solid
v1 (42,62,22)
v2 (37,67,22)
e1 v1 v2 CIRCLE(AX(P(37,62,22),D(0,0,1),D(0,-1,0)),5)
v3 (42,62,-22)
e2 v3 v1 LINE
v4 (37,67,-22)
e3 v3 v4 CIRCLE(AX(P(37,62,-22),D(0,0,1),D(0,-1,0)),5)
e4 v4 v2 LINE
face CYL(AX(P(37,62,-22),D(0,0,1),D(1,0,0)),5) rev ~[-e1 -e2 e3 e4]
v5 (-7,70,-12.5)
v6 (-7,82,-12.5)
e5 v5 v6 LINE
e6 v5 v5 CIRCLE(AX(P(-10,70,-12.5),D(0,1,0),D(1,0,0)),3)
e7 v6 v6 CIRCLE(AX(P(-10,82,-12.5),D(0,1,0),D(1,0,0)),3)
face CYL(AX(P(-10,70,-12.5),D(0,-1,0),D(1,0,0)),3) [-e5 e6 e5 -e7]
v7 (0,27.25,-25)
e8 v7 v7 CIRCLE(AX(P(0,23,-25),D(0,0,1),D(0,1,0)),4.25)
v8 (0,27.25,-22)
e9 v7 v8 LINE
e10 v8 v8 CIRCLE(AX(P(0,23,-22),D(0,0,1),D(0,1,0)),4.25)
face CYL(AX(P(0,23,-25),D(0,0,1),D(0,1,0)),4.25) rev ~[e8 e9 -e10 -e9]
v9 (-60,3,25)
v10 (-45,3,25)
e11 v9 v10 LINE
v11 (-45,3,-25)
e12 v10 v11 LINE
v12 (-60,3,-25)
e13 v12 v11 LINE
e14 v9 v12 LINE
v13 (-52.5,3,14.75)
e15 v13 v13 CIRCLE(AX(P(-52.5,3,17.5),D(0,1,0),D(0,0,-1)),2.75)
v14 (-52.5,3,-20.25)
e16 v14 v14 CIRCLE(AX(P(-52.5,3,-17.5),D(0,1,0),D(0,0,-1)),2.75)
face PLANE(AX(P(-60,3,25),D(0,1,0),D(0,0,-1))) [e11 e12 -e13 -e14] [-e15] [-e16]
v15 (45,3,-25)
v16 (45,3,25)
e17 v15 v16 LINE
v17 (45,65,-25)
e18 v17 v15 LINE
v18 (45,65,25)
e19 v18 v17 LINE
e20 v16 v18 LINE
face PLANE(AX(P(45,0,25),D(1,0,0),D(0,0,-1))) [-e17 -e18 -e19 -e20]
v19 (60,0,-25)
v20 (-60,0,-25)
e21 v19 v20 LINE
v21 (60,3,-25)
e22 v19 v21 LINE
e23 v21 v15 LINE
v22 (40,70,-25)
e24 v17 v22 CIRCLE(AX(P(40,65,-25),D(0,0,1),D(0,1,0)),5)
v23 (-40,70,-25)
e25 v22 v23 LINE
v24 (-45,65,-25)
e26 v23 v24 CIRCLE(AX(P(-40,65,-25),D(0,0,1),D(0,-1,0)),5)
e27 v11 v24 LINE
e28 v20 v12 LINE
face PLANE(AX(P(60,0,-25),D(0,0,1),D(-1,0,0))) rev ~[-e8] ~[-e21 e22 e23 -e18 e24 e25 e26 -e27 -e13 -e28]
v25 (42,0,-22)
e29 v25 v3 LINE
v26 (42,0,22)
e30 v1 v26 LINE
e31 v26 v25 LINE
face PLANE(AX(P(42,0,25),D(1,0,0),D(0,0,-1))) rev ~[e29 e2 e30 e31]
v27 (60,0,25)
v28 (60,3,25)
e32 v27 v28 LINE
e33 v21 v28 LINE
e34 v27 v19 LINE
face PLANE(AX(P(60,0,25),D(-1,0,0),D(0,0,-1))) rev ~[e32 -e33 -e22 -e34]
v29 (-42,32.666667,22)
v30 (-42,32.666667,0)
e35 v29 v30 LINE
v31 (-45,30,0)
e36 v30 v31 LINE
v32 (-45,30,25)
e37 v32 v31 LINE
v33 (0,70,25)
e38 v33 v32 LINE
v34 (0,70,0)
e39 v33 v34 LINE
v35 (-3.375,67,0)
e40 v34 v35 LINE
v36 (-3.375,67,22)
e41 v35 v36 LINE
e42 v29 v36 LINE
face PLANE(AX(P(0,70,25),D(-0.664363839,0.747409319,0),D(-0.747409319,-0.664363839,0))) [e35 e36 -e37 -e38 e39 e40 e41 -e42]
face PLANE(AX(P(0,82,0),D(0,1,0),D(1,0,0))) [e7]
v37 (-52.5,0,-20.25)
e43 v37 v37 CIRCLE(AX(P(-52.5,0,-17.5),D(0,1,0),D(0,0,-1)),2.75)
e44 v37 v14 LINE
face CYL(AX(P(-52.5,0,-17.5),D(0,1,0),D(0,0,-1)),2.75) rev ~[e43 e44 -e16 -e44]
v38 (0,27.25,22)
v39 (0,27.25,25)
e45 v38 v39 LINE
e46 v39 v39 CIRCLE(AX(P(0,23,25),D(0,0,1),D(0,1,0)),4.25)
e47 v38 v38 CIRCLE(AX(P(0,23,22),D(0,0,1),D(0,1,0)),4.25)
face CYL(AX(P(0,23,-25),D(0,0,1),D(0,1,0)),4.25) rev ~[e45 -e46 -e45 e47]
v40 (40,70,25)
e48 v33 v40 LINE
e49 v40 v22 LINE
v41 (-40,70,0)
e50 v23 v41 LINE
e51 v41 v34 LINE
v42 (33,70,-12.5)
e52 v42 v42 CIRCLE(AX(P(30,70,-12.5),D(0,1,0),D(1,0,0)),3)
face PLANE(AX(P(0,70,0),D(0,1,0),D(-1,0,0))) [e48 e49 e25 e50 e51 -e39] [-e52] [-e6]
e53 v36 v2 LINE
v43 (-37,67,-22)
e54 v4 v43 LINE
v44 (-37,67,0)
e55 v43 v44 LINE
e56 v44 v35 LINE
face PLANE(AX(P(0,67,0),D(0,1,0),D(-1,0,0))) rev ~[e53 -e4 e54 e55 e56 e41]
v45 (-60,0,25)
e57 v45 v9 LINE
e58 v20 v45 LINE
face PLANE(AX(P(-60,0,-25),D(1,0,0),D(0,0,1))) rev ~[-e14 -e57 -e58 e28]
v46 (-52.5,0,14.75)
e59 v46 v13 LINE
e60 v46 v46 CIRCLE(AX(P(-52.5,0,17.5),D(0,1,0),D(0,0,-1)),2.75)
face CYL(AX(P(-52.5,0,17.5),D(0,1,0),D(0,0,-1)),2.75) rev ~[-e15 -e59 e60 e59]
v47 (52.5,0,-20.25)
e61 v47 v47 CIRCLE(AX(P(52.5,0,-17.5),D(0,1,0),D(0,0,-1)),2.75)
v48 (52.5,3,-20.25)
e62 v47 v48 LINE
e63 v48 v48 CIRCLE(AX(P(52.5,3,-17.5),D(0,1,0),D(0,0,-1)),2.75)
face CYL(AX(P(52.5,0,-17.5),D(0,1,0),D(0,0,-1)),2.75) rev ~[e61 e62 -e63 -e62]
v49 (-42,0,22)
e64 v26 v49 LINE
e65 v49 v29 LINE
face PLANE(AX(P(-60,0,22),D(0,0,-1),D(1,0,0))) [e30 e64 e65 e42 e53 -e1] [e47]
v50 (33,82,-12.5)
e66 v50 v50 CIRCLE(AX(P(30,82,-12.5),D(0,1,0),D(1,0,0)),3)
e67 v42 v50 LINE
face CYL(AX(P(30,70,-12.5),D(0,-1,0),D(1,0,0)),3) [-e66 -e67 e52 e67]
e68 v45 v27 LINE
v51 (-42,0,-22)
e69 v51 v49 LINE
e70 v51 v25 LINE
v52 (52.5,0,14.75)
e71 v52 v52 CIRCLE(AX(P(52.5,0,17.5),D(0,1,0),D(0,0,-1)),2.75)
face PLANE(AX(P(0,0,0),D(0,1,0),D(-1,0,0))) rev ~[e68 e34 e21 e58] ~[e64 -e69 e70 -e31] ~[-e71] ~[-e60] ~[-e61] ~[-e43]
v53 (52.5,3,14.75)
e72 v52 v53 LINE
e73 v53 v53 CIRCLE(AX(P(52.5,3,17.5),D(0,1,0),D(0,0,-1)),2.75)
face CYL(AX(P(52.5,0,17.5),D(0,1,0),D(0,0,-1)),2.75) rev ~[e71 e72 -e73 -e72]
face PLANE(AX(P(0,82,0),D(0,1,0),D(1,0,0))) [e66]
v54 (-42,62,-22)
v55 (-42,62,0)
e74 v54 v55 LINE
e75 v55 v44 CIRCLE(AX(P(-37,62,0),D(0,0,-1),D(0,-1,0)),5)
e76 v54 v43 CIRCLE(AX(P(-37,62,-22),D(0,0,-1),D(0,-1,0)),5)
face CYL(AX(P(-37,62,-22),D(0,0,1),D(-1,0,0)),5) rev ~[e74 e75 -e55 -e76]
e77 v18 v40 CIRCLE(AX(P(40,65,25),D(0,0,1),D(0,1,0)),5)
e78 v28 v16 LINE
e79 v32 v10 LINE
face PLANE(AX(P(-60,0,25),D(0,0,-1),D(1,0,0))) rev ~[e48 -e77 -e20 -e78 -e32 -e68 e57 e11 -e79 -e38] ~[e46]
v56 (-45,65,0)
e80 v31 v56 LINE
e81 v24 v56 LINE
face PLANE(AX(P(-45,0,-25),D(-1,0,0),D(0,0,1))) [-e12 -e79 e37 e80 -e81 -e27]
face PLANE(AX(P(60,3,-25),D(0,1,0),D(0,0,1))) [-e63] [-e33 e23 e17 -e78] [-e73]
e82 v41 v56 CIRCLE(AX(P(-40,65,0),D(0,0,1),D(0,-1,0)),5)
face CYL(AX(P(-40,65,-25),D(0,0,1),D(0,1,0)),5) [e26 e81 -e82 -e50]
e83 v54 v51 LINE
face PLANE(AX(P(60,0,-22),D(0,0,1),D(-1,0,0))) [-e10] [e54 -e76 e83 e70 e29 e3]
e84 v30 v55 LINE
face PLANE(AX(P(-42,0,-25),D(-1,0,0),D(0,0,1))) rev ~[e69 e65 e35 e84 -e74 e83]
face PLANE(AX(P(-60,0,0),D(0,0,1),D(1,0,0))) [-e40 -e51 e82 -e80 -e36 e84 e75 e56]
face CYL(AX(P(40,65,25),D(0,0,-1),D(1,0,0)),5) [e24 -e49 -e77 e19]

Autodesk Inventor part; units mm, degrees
ref_plane "YZ Plane" through (0, 0, 0) normal (1, 0, 0) x (0, 1, 0)
ref_plane "XZ Plane" through (0, 0, 0) normal (0, 1, 0) x (-1, 0, 0)
ref_plane "XY Plane" through (0, 0, 0) normal (0, 0, 1) x (1, 0, 0)
sketch "Skizze1" plane through (0, 0, 0) normal (0, 1, 0) x (-1, 0, 0)
  line L0 (60, 25) -> (-60, 25)
  line L1 (-60, 25) -> (-60, -25)
  line L2 (-60, -25) -> (60, -25)
  line L3 (60, -25) -> (60, 25)
  point P0 (0, 0)
  point P1 (0, 25)
  point P2 (-60, 0)
  dimension "d0" = 120
  dimension "d1" = 50
extrude "Extrusion1" add sketch "Skizze1" along normal blind 70
sketch "Skizze2" plane through (60, 0, 25) normal (1, 0, 0) x (0, 0, -1)
  line L0 (0, 0) -> (50, 0) construction
  line L1 (50, 0) -> (50, 70) construction
  line L2 (0, 70) -> (50, 70) construction
  line L3 (0, 0) -> (0, 70) construction
  line L4 (0, 70) -> (50, 70)
  line L5 (50, 70) -> (50, 3)
  line L6 (50, 3) -> (0, 3)
  line L7 (0, 3) -> (0, 70)
  line L8 (50, 0) -> (50, 70) projected
  point P0 (25, 0)
  dimension "d4" = 3
extrude "Extrusion2" cut sketch "Skizze2" against normal blind 15
sketch "Skizze3" plane through (-60, 0, -25) normal (-1, 0, 0) x (0, 0, 1)
  line L0 (0, 0) -> (50, 0) construction
  line L1 (50, 0) -> (50, 70) construction
  line L2 (0, 70) -> (50, 70) construction
  line L3 (0, 0) -> (0, 70) construction
  line L4 (0, 70) -> (50, 70)
  line L5 (50, 70) -> (50, 3)
  line L6 (50, 3) -> (0, 3)
  line L7 (0, 3) -> (0, 70)
  line L8 (50, 0) -> (50, 70) projected
  point P0 (25, 0)
  dimension "d7" = 3
extrude "Extrusion3" cut sketch "Skizze3" against normal blind 15
shell "Wandung1" thickness 3 removed faces 1 at (20, 0, 8.3333)
sketch "Skizze4" plane through (0, 0, 0) normal (0, -1, 0) x (1, 0, 0)
  line L0 (42, 22) -> (42, -22) construction
  line L1 (42, -22) -> (-42, -22) construction
  line L2 (-42, -22) -> (-42, 22) construction
  line L3 (-42, 22) -> (42, 22) construction
  line L4 (-60, 25) -> (60, 25) construction
  line L5 (-60, -25) -> (-60, 25) construction
  line L6 (60, -25) -> (-60, -25) construction
  line L7 (60, 25) -> (60, -25) construction
  line L8 (-84, 0) -> (84, 0) construction
  line L9 (0, -35) -> (0, 35) construction
  point P0 (0, 0)
  point P1 (-52.5, -17.5)
  point P2 (-52.5, 17.5)
  point P3 (52.5, 17.5)
  point P4 (52.5, -17.5)
  dimension "d11" = 7.5
  dimension "d12" = 7.5
hole "Bohrung1" at (-52.5, 0, -17.5) at (-52.5, 0, 17.5) at (52.5, 0, 17.5) at (52.5, 0, -17.5) direction (0, 1, 0) diameter 5.5 end through all
sketch "Skizze5" plane through (60, 0, -25) normal (0, 0, -1) x (-1, 0, 0)
  line L0 (120, 3) -> (105, 3) projected
  line L1 (105, 3) -> (105, 70) projected
  line L2 (15, 70) -> (105, 70) projected
  line L3 (15, 70) -> (15, 3) projected
  line L4 (15, 3) -> (0, 3) projected
  line L5 (0, 0) -> (0, 3) projected
  line L6 (0, 0) -> (120, 0) projected
  line L7 (120, 0) -> (120, 3) projected
  point P0 (60, 0)
  point P1 (60, 23)
  point P2 (60, 0)
  dimension "d20" = 23
hole "Bohrung2" at (0, 23, -25) direction (0, 0, 1) diameter 8.5 end through all
sketch "Skizze6" plane through (-60, 0, 25) normal (0, 0, 1) x (1, 0, 0)
  circle A0 centre (60, 23) radius 4.25 construction
  line L0 (15, 3) -> (0, 3) construction
  line L1 (0, 0) -> (0, 3) construction
  line L2 (0, 0) -> (120, 0) construction
  line L3 (120, 0) -> (120, 3) construction
  line L4 (120, 3) -> (105, 3) construction
  line L5 (105, 3) -> (105, 70) construction
  line L6 (15, 70) -> (105, 70) construction
  line L7 (15, 70) -> (15, 3) construction
  line L8 (15, 70) -> (60, 70)
  line L9 (60, 70) -> (15, 30)
  line L10 (15, 30) -> (15, 70)
  line L11 (15, 70) -> (15, 3) projected
  point P0 (60, 0)
  dimension "d28" = 45
  dimension "d29" = 30
extrude "Extrusion4" cut sketch "Skizze6" against normal blind 25
sketch "Skizze7" plane through (0, 70, 0) normal (0, 1, 0) x (1, 0, 0)
  line L0 (0, 0) -> (0, -25) construction
  line L1 (0, -25) -> (45, -25) construction
  line L2 (45, -25) -> (45, 25) construction
  line L3 (45, 25) -> (-45, 25) construction
  line L4 (-45, 25) -> (-45, 0) construction
  line L5 (-45, 0) -> (0, 0) construction
  circle A0 centre (-10, 12.5) radius 3
  circle A1 centre (30, 12.5) radius 3
  point P0 (0, 0)
  point P1 (-45, 12.5)
  dimension "d32" = 6
  dimension "d34" = 6
  dimension "d35" = 40
  dimension "d43" = 15
extrude "Extrusion5" add sketch "Skizze7" along normal blind 12
thread "Gewinde1" size "M6x1" class "6g" standard "ANSI Metric M Profile" full length
thread "Gewinde2" size "M6x1" class "6g" standard "ANSI Metric M Profile" full length
fillet "Rundung1" radius 5 4 edges at (42, 67, 0) (-42, 67, -11) (-45, 70, -12.5) (45, 70, 0)
equation "\"d12\" = d11"
properties part number "Radkasten_Links"
